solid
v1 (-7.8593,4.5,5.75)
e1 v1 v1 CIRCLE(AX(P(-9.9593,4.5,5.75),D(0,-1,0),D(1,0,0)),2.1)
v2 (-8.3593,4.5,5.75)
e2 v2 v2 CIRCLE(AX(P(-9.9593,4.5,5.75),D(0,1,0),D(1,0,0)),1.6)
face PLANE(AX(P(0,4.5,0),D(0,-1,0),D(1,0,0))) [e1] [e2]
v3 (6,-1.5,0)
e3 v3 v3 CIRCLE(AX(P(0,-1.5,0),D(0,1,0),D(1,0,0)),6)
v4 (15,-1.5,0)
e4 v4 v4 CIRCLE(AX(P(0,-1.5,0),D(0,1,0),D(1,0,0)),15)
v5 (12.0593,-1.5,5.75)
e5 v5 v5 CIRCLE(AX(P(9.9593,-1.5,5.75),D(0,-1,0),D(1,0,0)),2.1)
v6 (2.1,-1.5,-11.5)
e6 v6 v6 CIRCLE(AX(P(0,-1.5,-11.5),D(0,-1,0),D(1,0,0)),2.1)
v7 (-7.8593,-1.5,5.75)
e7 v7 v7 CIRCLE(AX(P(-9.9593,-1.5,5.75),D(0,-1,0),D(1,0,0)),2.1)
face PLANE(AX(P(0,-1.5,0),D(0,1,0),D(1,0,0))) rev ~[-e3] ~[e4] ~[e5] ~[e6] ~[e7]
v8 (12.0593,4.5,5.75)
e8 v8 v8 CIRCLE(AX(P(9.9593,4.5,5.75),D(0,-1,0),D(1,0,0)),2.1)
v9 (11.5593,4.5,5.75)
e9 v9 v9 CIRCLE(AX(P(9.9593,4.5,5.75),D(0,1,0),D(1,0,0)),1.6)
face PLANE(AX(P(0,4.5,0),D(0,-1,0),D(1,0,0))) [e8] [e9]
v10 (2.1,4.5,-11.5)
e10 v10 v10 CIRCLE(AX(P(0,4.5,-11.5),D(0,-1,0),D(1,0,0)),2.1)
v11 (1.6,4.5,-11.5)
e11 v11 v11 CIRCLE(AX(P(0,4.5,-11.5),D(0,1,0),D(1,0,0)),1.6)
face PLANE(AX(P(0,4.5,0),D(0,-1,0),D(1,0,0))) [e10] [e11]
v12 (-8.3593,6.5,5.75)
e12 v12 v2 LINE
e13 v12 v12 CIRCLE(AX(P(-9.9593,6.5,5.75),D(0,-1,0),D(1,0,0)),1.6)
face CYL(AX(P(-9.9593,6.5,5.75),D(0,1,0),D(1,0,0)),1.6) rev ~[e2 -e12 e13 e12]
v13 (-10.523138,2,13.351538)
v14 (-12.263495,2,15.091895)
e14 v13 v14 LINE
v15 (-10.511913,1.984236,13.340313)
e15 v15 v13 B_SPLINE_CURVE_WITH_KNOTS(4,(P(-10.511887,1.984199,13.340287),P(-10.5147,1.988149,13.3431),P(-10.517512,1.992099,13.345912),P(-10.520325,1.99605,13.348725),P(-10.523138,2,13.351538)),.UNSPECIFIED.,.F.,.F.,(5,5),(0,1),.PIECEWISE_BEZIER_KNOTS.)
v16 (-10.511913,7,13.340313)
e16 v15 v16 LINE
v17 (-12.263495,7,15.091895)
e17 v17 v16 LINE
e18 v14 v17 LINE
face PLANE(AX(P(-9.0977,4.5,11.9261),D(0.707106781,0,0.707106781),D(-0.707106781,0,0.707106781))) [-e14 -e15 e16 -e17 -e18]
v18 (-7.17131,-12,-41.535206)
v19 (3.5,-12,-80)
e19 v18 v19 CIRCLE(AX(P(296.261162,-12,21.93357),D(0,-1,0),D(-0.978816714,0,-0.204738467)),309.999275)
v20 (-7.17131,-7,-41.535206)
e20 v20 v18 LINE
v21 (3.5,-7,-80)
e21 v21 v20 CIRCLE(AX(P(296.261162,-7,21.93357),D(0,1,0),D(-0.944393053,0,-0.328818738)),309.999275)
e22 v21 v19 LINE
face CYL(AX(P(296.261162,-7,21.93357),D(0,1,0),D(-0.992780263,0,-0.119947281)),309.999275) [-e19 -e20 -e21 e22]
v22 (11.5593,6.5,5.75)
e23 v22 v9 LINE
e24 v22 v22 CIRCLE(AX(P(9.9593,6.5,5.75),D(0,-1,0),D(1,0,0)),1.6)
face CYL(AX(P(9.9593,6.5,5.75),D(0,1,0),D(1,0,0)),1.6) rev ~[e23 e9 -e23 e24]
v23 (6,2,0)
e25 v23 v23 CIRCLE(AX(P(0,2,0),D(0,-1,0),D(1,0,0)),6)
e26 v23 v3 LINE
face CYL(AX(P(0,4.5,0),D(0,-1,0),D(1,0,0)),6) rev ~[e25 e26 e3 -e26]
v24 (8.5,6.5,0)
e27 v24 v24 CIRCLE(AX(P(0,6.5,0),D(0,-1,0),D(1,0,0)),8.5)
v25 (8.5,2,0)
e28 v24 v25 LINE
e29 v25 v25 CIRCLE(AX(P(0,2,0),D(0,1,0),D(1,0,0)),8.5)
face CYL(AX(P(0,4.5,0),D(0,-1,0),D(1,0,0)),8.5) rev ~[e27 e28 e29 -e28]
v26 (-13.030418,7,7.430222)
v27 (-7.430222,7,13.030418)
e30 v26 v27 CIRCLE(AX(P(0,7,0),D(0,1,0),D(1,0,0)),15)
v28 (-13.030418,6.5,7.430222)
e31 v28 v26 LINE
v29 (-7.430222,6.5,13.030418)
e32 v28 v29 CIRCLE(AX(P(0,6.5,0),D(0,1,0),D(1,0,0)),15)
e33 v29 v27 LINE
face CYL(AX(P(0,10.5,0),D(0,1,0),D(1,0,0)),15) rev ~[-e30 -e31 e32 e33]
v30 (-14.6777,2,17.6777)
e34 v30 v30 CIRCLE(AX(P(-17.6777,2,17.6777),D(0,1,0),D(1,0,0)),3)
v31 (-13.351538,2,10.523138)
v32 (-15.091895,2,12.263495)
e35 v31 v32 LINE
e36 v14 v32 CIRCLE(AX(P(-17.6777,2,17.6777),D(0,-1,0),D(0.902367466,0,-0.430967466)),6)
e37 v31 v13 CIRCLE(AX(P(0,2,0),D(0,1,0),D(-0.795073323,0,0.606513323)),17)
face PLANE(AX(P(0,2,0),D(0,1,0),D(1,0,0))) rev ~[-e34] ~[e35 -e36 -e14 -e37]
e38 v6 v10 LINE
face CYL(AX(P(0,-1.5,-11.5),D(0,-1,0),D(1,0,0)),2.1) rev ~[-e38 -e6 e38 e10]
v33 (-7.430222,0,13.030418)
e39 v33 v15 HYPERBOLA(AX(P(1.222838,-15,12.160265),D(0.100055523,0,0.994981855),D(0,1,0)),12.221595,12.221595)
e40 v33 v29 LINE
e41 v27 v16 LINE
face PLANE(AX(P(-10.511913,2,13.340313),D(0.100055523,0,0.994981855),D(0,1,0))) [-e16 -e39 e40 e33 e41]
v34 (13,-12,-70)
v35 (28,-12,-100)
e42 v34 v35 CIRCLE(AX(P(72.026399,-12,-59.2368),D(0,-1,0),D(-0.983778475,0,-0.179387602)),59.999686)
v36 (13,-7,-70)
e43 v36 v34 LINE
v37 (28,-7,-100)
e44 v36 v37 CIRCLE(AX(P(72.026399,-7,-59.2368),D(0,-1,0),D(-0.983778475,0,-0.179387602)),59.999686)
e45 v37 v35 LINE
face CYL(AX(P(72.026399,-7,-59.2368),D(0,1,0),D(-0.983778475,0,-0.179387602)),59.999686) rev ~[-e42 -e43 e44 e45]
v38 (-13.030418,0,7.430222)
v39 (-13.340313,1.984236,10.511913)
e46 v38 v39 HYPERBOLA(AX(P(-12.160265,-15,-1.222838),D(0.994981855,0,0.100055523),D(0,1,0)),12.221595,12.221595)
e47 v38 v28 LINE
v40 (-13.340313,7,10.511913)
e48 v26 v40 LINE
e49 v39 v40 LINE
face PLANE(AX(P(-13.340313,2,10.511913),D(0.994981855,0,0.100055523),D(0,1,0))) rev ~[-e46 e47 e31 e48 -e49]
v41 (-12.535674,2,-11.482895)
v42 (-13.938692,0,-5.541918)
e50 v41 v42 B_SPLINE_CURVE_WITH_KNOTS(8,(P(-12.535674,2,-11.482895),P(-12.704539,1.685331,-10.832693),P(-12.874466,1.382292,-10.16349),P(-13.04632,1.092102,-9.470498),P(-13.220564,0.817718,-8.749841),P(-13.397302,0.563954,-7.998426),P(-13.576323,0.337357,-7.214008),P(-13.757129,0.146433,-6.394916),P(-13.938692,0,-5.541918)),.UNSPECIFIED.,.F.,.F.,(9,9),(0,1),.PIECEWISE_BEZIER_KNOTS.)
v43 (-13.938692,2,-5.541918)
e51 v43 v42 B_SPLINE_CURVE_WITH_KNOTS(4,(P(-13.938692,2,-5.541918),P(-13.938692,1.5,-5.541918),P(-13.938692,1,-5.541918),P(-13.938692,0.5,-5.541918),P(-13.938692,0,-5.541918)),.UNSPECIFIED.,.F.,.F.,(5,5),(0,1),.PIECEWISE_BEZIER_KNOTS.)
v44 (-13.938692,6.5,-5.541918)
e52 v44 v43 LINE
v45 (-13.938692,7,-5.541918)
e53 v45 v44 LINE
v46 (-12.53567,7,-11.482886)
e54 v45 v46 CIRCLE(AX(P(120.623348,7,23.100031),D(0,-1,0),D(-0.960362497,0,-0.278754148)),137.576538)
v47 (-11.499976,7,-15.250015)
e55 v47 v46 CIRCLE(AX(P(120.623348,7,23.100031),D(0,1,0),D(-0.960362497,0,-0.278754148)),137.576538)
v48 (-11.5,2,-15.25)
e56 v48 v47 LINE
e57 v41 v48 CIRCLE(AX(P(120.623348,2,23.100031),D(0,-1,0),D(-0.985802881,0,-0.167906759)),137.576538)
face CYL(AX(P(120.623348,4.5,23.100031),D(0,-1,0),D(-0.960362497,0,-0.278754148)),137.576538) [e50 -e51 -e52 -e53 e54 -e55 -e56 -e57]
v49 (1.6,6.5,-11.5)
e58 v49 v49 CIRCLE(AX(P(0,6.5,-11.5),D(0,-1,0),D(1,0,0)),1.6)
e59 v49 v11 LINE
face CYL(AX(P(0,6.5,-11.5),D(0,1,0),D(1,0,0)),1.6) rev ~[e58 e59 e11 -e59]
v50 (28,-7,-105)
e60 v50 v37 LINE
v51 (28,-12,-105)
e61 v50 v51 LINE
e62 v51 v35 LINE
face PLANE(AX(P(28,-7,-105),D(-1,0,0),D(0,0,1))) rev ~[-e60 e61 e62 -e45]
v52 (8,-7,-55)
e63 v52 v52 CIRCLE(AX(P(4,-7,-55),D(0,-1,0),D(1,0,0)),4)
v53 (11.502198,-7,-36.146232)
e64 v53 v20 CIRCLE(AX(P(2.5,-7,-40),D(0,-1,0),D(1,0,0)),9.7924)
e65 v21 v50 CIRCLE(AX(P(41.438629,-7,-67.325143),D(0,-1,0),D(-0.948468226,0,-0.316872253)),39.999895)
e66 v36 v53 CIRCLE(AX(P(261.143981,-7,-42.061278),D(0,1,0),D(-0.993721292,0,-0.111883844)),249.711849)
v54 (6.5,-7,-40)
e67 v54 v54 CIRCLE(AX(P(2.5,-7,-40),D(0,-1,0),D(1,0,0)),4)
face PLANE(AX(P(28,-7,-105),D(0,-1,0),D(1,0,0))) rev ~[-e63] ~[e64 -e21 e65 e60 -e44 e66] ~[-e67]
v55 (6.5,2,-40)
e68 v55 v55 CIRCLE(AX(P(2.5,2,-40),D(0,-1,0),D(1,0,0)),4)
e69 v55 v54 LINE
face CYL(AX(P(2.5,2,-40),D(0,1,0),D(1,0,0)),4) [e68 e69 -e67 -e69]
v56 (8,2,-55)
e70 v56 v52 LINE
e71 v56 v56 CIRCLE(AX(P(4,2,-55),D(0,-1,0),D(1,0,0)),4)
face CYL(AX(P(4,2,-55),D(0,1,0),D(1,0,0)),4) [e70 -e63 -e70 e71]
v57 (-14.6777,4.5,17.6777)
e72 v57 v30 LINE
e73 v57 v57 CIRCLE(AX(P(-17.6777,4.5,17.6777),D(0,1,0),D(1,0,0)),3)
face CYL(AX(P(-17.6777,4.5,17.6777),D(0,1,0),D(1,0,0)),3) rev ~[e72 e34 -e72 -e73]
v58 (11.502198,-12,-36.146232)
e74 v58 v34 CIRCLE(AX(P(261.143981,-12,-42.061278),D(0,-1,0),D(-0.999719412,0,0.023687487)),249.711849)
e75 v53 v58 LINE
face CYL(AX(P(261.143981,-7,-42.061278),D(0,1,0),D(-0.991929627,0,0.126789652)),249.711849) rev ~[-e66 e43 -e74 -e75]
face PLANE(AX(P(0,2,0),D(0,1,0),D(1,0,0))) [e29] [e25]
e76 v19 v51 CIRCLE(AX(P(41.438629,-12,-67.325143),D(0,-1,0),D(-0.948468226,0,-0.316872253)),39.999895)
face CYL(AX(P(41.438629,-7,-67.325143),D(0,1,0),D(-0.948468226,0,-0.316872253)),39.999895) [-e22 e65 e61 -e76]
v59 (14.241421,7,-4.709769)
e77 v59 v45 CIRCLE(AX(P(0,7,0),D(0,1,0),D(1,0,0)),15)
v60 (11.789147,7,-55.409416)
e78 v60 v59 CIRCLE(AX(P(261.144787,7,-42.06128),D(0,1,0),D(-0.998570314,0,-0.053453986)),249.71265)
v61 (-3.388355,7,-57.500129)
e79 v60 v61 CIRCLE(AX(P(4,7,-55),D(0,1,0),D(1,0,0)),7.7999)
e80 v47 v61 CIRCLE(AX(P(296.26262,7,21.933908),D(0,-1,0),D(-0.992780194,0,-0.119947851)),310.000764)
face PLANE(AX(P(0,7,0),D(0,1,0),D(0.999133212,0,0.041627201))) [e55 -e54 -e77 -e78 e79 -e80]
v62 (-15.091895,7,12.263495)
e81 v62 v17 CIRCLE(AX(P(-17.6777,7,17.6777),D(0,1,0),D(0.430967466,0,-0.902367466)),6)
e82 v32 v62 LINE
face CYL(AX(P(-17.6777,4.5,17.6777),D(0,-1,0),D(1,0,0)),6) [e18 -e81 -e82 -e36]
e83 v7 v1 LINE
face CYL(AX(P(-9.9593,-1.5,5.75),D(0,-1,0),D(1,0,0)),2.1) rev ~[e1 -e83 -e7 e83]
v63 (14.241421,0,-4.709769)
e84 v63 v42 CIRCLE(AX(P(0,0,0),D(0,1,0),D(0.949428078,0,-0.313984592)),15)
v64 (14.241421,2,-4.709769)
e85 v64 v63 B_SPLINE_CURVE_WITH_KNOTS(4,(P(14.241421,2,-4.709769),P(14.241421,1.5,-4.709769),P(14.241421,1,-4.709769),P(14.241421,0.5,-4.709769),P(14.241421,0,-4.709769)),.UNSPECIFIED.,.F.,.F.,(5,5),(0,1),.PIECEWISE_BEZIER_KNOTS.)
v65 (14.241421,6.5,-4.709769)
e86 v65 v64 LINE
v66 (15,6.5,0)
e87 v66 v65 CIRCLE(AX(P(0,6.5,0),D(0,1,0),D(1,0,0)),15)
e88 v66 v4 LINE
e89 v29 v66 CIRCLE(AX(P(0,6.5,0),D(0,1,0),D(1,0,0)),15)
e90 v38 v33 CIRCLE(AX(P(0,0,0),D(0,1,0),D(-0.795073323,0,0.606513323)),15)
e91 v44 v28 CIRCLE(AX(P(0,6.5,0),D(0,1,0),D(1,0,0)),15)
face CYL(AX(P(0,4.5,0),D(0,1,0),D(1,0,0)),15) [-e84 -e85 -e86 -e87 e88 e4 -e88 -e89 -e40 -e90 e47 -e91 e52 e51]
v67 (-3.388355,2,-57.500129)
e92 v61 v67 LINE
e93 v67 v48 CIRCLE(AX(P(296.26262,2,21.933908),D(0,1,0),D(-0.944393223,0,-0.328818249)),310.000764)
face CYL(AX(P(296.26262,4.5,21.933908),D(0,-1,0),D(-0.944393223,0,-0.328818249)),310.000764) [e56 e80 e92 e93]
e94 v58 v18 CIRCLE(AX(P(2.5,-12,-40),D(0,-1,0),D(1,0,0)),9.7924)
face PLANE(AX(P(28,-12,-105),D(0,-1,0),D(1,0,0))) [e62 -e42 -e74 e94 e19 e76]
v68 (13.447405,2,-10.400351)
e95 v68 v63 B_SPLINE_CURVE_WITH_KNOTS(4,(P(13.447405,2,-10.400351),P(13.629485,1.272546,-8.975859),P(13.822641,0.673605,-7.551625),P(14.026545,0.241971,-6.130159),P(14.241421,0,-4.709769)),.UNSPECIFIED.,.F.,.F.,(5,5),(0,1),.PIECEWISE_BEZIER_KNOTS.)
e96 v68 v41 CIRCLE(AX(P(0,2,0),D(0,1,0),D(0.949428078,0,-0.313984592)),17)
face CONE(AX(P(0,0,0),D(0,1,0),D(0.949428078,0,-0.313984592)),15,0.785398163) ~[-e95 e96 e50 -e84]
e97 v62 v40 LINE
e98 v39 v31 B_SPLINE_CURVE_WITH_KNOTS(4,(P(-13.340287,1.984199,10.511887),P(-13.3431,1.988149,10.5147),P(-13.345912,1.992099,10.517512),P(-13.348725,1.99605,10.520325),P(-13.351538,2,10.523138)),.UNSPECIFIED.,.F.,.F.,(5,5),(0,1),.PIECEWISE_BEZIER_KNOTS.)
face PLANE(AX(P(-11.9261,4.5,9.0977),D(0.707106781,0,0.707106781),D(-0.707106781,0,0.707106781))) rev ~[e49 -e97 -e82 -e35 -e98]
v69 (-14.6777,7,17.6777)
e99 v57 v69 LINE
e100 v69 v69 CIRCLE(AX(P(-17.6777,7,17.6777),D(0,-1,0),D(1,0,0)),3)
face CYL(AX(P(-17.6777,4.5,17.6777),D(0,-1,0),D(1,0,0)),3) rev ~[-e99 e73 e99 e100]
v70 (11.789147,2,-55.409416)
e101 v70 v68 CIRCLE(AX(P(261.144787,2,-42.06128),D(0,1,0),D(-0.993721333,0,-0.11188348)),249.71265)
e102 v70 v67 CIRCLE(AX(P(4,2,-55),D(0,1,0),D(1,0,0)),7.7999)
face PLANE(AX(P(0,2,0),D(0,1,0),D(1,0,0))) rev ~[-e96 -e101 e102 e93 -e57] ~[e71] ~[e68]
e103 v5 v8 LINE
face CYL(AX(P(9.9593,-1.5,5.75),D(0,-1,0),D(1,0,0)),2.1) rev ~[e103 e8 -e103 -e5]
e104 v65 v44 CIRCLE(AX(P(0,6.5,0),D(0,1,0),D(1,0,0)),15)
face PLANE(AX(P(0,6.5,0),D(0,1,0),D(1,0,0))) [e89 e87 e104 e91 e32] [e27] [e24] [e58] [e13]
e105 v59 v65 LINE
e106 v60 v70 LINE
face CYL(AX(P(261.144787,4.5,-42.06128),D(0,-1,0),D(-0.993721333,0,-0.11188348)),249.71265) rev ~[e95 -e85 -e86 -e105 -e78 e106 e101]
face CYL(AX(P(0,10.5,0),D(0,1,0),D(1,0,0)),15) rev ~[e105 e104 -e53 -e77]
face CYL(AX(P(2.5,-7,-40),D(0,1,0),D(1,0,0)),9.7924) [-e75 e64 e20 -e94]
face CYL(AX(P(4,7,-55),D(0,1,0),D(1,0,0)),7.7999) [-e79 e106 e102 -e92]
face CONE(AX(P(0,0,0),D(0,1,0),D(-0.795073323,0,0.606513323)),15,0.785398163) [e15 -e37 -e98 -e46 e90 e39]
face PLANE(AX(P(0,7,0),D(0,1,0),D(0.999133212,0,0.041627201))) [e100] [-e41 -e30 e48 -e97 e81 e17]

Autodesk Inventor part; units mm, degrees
sketch "Skizze10" plane through (0, 0, 0) normal (1, 0, 0) x (0, 1, 0)
  line L0 (-1.4, 0) -> (8.4, 0) projected
  line L1 (0, -13.2) -> (0, 2.2) projected
  line L2 (2, -2.5) -> (7, -2.5)
  line L3 (7, -2.5) -> (7, -8.5)
  line L4 (7, -8.5) -> (2, -8.5)
  line L5 (2, -8.5) -> (2, -2.5)
  point P0 (0, 0)
  point P1 (0, -11)
  dimension "d135" = 8.5
  dimension "d137" = 5
  dimension "d138" = 2
  dimension "d145" = 2.5
revolve "Umdrehung2" add sketch "Skizze10" angle 360 about axis through (0, -10, 0) along (0, 1, 0)
ref_plane "Arbeitsebene2" through (0, 6, 0) normal (0, 1, 0) x (1, 0, 0)
ref_plane "Arbeitsebene3" through (0, 4.5, 0) normal (0, 1, 0) x (1, 0, 0)
sketch "Skizze12" plane through (0, 4.5, 0) normal (0, 1, 0) x (1, 0, 0)
  arc A0 (3.5, 80) -> (-11.5, 15.25) centre (296.2619, -21.9337) ccw projected
  arc A1 (28, 100) -> (13, 70) centre (72.0267, 59.2367) ccw projected
  line L0 (28, 100) -> (28, 105) projected
  arc A2 (28, 105) -> (3.5, 80) centre (41.4387, 67.3251) ccw projected
  circle A3 centre (0, 0) radius 15
  arc A4 (13, 70) -> (15, 0) centre (261.1443, 42.0613) ccw
  arc A5 (-11.5, 15.25) -> (-15, 0) centre (120.624, -23.1002) ccw
  circle A6 centre (0, 0) radius 8.5 projected
  line L1 (0, 0) -> (-17.6777, -17.6777)
  line L2 (-87.6656, 0) -> (360.2498, 0) projected
  line L3 (0, 134.1222) -> (0, -49.9776) projected
  circle A7 centre (-17.6777, -17.6777) radius 6
  circle A8 centre (-17.6777, -17.6777) radius 3
  line L4 (1.4142, -1.4142) -> (-12.7279, -15.5563)
  line L5 (-1.4142, 1.4142) -> (-15.5563, -12.7279)
  point P0 (-16.4, 0)
  point P1 (-11.9261, -9.0977)
  point P2 (-15.0919, -12.2635)
  point P3 (-12.2635, -15.0919)
  point P4 (-9.0977, -11.9261)
  dimension "d147" = 30
  dimension "d148" = 45
  dimension "d149" = 25
  dimension "d150" = 12
  dimension "d152" = 3
  dimension "d153" = 2
  dimension "d154" = 2
sketch "Skizze13" plane through (0, 4.5, 0) normal (0, 1, 0) x (1, 0, 0)
  point P0 (0, 0)
extrude "Extrusion8" add sketch "Skizze12" along normal mid plane 5 contours A2 L0 A1 A4 A3 L3 A0 | L3 A3 A5 A0 | L3 A6 L2 A5 A3 | A3 A4 L2 A6 L3 | L3 L2 A6 | A6 L2 L3 | L2 A6 L5 A3 | A3 L3 A6 L2 | A6 L3 L2 | L2 L5 A6 | L3 L4 A6 L1 | L1 A6 L5 L2 | L5 A6 L1 A3 | A3 L1 A7 L5 | A3 L4 A6 L3 | A6 L4 L3 | A6 L4 A3 L1 | A3 L4 A7 L1 | A7
sketch "Skizze14" plane through (0, 4.5, 0) normal (0, 1, 0) x (1, 0, 0)
  circle A0 centre (0, 0) radius 2.5
  dimension "d157" = 5
extrude "Extrusion9" cut sketch "Skizze14" along normal mid plane 20
sketch "Skizze15" plane through (0, 4.5, 0) normal (0, 1, 0) x (1, 0, 0)
  arc A0 (-11.5, 15.25) -> (-15, 0) centre (120.624, -23.1002) ccw projected
  circle A1 centre (0, 0) radius 15
extrude "Extrusion10" add sketch "Skizze15" along normal mid plane 12
sketch "Skizze16" plane through (0, 4.5, 0) normal (0, 1, 0) x (1, 0, 0)
  circle A0 centre (0, 0) radius 6
  dimension "d162" = 12
extrude "Extrusion11" cut sketch "Skizze16" along normal mid plane 12
sketch "Skizze17" plane through (0, 4.5, 0) normal (0, 1, 0) x (1, 0, 0)
  circle A0 centre (0, 0) radius 8.5
  dimension "d165" = 17
extrude "Extrusion12" cut sketch "Skizze17" along normal mid plane 5
chamfer "Fasen7" distance 2 angle 45 8 edges at (-10.6066, 7, 10.6066) (-9.0977, 5.75, 11.9261) (-9.0977, 3.25, 11.9261) (-10.6066, 2, 10.6066) (0.4428, 2, -14.9935) (0.4428, 7, -14.9935) (-11.9261, 5.75, 9.0977) (-11.9261, 3.25, 9.0977)
sketch "Skizze18" plane through (28, 2, -105) normal (0, -1, 0) x (1, 0, 0)
  point P0 (-28, 105)
ref_plane "Arbeitsebene4" through (28, -7, -105) normal (0, -1, 0) x (1, 0, 0)
sketch "Skizze20" plane through (28, 2, -105) normal (0, -1, 0) x (1, 0, 0)
  circle A0 centre (-24, 50) radius 4
  circle A1 centre (-25.5, 65) radius 4
  point P0 (-28, 105)
  dimension "d188" = 8
  dimension "d189" = 8
  dimension "d192" = 1.5
  dimension "d193" = 15
extrude "Extrusion14" add sketch "Skizze20" along normal blind 9
sketch "Skizze19" plane through (28, -7, -105) normal (0, -1, 0) x (1, 0, 0)
  arc A0 (-24.5, 25) -> (0, 0) centre (13.4387, 37.6749) ccw projected
  arc A1 (-15, 35) -> (0, 5) centre (44.0267, 45.7633) ccw projected
  line L0 (0, 0) -> (0, 5) projected
  line L1 (-15, 35) -> (-24.5, 25)
  arc A2 (-39.5, 89.75) -> (-24.5, 25) centre (268.2619, 126.9337) ccw projected
  arc A3 (-14.5526, 94.5996) -> (-15, 35) centre (233.1443, 62.9387) ccw projected
  line L2 (-27, 80) -> (3, 80) construction
  line L3 (-27, 80) -> (-7, 80) construction
  line L4 (-27, 82.5) -> (-5.7868, 82.5) construction
  circle A4 centre (-27, 80) radius 4 projected
  circle A5 centre (-27, 80) radius 4 projected
  circle A6 centre (-27, 60) radius 2.5 projected
  circle A7 centre (-27, 60) radius 2.5 projected
  circle A8 centre (-25.5, 65) radius 4 projected
  circle A9 centre (-25.5, 65) radius 9.7924
  point P0 (-28, 105)
  point P1 (-16.5679, 62.8977)
  point P2 (-37.8031, 77.6969)
  point P3 (-16.4978, 68.8538)
  point P4 (-35.1713, 63.4649)
extrude "Extrusion13" add sketch "Skizze19" along normal blind 5 contours L1 A1 L0 A0 | A2 A9 A3 L1 | A2 A9 A3 | A6 A8 | A8 A6 | A6 A8
sketch "Skizze21" plane through (28, 7, -100) normal (0, 1, 0) x (1, 0, 0)
  circle A0 centre (-24, -45) radius 4 projected
  circle A1 centre (-25.5, -60) radius 4 projected
  circle A2 centre (-27, -75) radius 4 projected
  circle A3 centre (-24, -45) radius 7.7999
  arc A4 (-14.5526, -89.5996) -> (-40.5357, -88.5171) centre (-28, -100) ccw projected
  arc A5 (-15, -30) -> (-14.5526, -89.5996) centre (233.1443, -57.9387) ccw projected
  arc A6 (0, 0) -> (-15, -30) centre (44.0267, -40.7633) ccw projected
  line L0 (0, 0) -> (0, 5) projected
  arc A7 (0, 5) -> (-24.5, -20) centre (13.4387, -32.6749) ccw projected
  arc A8 (-24.5, -20) -> (-39.5, -84.75) centre (268.2619, -121.9337) ccw projected
  arc A9 (-39.5, -84.75) -> (-40.5357, -88.5171) centre (92.624, -123.1002) ccw projected
  point P0 (-31.3884, -42.5)
  point P1 (-16.2109, -44.5906)
extrude "Extrusion15" cut sketch "Skizze21" against normal blind 5 contours A3 A8 A7 L0 A6 A5
sketch "Skizze22" plane through (0, 10.5, 0) normal (0, 1, 0) x (1, 0, 0)
  circle A0 centre (0, 0) radius 15
extrude "Extrusion16" cut sketch "Skizze22" against normal blind 4
sketch "Skizze23" plane through (0, 6.5, 0) normal (0, 1, 0) x (1, 0, 0)
  circle A0 centre (0, 0) radius 11.5
  circle A1 centre (0, 0) radius 8.5 projected
  arc A2 (-7.4302, -13.0304) -> (14.2414, 4.7098) centre (0, 0) ccw projected
  arc A3 (14.2414, 4.7098) -> (-13.9387, 5.5419) centre (0, 0) ccw projected
  arc A4 (-13.9387, 5.5419) -> (-13.0304, -7.4302) centre (0, 0) ccw projected
  arc A5 (-13.0304, -7.4302) -> (-7.4302, -13.0304) centre (0, 0) ccw projected
  line L0 (0, 0) -> (0, 30.1183)
  line L1 (0, 0) -> (-26.0832, -15.0591)
  line L2 (0, 0) -> (26.0832, -15.0591)
  circle A6 centre (-9.9593, -5.75) radius 1.6
  circle A7 centre (9.9593, -5.75) radius 1.6
  circle A8 centre (0, 11.5) radius 1.6
  dimension "d198" = 3
  dimension "d201" = 360
  dimension "d203" = 3.2
  dimension "d204" = 3.2
  dimension "d205" = 3.2
  dimension "d210" = 23
extrude "Extrusion17" cut sketch "Skizze23" against normal blind 8 contours A8 L0 A0 | A0 L0 A8 | A7 L2 A0 | A0 L2 A7 | L0 A8 A0 | A0 A8 L0 | L2 A7 A0 | A0 A7 L2 | A6 L1 A0 | A0 L1 A6 | A6 L1 A0 | A0 L1 A6
sketch "Skizze24" plane through (0, 7, 0) normal (0, 1, 0) x (0.9991332, 0, 0.0416272)
  arc A0 (-5.779, 57.3091) -> (-12.1248, 14.7581) centre (296.9181, -9.5822) ccw projected
  arc A1 (-12.1248, 14.7581) -> (-13.0028, 10.9511) centre (121.481, -18.0589) ccw projected
  arc A2 (13.0028, 10.9511) -> (-13.0028, 10.9511) centre (0, 0) ccw projected
  arc A3 (9.4724, 55.8521) -> (13.0028, 10.9511) centre (259.167, 52.8955) ccw projected
  line L0 (41.2501, 29.7308) -> (-28.4254, 29.7308)
  line L1 (-28.4254, 29.7308) -> (-28.4254, -36.8887)
  line L2 (-28.4254, -36.8887) -> (41.2501, -36.8887)
  line L3 (41.2501, -36.8887) -> (41.2501, 29.7308)
  point P0 (-10.579, 29.7308)
  point P1 (10.5316, 29.7308)
extrude "Extrusion18" cut sketch "Skizze24" along normal blind 5 contours A0 A1 A2 A3 L0 L3 L2 L1
sketch "Skizze26" plane through (0, -1.5, 0) normal (0, -1, 0) x (1, 0, 0)
  circle A0 centre (0, -11.5) radius 1.6 projected
  circle A1 centre (9.9593, 5.75) radius 1.6 projected
  circle A2 centre (-9.9593, 5.75) radius 1.6 projected
  circle A3 centre (-9.9593, 5.75) radius 2.1
  circle A4 centre (9.9593, 5.75) radius 2.1
  circle A5 centre (0, -11.5) radius 2.1
  dimension "d213" = 4.2
  dimension "d214" = 4.2
  dimension "d215" = 4.2
extrude "Extrusion19" cut sketch "Skizze26" against normal blind 6 contours A0 | A1 | A2 | A3 | A4 | A5
properties part number "01-03-01 Zange links nue" material "Phenolharz"
